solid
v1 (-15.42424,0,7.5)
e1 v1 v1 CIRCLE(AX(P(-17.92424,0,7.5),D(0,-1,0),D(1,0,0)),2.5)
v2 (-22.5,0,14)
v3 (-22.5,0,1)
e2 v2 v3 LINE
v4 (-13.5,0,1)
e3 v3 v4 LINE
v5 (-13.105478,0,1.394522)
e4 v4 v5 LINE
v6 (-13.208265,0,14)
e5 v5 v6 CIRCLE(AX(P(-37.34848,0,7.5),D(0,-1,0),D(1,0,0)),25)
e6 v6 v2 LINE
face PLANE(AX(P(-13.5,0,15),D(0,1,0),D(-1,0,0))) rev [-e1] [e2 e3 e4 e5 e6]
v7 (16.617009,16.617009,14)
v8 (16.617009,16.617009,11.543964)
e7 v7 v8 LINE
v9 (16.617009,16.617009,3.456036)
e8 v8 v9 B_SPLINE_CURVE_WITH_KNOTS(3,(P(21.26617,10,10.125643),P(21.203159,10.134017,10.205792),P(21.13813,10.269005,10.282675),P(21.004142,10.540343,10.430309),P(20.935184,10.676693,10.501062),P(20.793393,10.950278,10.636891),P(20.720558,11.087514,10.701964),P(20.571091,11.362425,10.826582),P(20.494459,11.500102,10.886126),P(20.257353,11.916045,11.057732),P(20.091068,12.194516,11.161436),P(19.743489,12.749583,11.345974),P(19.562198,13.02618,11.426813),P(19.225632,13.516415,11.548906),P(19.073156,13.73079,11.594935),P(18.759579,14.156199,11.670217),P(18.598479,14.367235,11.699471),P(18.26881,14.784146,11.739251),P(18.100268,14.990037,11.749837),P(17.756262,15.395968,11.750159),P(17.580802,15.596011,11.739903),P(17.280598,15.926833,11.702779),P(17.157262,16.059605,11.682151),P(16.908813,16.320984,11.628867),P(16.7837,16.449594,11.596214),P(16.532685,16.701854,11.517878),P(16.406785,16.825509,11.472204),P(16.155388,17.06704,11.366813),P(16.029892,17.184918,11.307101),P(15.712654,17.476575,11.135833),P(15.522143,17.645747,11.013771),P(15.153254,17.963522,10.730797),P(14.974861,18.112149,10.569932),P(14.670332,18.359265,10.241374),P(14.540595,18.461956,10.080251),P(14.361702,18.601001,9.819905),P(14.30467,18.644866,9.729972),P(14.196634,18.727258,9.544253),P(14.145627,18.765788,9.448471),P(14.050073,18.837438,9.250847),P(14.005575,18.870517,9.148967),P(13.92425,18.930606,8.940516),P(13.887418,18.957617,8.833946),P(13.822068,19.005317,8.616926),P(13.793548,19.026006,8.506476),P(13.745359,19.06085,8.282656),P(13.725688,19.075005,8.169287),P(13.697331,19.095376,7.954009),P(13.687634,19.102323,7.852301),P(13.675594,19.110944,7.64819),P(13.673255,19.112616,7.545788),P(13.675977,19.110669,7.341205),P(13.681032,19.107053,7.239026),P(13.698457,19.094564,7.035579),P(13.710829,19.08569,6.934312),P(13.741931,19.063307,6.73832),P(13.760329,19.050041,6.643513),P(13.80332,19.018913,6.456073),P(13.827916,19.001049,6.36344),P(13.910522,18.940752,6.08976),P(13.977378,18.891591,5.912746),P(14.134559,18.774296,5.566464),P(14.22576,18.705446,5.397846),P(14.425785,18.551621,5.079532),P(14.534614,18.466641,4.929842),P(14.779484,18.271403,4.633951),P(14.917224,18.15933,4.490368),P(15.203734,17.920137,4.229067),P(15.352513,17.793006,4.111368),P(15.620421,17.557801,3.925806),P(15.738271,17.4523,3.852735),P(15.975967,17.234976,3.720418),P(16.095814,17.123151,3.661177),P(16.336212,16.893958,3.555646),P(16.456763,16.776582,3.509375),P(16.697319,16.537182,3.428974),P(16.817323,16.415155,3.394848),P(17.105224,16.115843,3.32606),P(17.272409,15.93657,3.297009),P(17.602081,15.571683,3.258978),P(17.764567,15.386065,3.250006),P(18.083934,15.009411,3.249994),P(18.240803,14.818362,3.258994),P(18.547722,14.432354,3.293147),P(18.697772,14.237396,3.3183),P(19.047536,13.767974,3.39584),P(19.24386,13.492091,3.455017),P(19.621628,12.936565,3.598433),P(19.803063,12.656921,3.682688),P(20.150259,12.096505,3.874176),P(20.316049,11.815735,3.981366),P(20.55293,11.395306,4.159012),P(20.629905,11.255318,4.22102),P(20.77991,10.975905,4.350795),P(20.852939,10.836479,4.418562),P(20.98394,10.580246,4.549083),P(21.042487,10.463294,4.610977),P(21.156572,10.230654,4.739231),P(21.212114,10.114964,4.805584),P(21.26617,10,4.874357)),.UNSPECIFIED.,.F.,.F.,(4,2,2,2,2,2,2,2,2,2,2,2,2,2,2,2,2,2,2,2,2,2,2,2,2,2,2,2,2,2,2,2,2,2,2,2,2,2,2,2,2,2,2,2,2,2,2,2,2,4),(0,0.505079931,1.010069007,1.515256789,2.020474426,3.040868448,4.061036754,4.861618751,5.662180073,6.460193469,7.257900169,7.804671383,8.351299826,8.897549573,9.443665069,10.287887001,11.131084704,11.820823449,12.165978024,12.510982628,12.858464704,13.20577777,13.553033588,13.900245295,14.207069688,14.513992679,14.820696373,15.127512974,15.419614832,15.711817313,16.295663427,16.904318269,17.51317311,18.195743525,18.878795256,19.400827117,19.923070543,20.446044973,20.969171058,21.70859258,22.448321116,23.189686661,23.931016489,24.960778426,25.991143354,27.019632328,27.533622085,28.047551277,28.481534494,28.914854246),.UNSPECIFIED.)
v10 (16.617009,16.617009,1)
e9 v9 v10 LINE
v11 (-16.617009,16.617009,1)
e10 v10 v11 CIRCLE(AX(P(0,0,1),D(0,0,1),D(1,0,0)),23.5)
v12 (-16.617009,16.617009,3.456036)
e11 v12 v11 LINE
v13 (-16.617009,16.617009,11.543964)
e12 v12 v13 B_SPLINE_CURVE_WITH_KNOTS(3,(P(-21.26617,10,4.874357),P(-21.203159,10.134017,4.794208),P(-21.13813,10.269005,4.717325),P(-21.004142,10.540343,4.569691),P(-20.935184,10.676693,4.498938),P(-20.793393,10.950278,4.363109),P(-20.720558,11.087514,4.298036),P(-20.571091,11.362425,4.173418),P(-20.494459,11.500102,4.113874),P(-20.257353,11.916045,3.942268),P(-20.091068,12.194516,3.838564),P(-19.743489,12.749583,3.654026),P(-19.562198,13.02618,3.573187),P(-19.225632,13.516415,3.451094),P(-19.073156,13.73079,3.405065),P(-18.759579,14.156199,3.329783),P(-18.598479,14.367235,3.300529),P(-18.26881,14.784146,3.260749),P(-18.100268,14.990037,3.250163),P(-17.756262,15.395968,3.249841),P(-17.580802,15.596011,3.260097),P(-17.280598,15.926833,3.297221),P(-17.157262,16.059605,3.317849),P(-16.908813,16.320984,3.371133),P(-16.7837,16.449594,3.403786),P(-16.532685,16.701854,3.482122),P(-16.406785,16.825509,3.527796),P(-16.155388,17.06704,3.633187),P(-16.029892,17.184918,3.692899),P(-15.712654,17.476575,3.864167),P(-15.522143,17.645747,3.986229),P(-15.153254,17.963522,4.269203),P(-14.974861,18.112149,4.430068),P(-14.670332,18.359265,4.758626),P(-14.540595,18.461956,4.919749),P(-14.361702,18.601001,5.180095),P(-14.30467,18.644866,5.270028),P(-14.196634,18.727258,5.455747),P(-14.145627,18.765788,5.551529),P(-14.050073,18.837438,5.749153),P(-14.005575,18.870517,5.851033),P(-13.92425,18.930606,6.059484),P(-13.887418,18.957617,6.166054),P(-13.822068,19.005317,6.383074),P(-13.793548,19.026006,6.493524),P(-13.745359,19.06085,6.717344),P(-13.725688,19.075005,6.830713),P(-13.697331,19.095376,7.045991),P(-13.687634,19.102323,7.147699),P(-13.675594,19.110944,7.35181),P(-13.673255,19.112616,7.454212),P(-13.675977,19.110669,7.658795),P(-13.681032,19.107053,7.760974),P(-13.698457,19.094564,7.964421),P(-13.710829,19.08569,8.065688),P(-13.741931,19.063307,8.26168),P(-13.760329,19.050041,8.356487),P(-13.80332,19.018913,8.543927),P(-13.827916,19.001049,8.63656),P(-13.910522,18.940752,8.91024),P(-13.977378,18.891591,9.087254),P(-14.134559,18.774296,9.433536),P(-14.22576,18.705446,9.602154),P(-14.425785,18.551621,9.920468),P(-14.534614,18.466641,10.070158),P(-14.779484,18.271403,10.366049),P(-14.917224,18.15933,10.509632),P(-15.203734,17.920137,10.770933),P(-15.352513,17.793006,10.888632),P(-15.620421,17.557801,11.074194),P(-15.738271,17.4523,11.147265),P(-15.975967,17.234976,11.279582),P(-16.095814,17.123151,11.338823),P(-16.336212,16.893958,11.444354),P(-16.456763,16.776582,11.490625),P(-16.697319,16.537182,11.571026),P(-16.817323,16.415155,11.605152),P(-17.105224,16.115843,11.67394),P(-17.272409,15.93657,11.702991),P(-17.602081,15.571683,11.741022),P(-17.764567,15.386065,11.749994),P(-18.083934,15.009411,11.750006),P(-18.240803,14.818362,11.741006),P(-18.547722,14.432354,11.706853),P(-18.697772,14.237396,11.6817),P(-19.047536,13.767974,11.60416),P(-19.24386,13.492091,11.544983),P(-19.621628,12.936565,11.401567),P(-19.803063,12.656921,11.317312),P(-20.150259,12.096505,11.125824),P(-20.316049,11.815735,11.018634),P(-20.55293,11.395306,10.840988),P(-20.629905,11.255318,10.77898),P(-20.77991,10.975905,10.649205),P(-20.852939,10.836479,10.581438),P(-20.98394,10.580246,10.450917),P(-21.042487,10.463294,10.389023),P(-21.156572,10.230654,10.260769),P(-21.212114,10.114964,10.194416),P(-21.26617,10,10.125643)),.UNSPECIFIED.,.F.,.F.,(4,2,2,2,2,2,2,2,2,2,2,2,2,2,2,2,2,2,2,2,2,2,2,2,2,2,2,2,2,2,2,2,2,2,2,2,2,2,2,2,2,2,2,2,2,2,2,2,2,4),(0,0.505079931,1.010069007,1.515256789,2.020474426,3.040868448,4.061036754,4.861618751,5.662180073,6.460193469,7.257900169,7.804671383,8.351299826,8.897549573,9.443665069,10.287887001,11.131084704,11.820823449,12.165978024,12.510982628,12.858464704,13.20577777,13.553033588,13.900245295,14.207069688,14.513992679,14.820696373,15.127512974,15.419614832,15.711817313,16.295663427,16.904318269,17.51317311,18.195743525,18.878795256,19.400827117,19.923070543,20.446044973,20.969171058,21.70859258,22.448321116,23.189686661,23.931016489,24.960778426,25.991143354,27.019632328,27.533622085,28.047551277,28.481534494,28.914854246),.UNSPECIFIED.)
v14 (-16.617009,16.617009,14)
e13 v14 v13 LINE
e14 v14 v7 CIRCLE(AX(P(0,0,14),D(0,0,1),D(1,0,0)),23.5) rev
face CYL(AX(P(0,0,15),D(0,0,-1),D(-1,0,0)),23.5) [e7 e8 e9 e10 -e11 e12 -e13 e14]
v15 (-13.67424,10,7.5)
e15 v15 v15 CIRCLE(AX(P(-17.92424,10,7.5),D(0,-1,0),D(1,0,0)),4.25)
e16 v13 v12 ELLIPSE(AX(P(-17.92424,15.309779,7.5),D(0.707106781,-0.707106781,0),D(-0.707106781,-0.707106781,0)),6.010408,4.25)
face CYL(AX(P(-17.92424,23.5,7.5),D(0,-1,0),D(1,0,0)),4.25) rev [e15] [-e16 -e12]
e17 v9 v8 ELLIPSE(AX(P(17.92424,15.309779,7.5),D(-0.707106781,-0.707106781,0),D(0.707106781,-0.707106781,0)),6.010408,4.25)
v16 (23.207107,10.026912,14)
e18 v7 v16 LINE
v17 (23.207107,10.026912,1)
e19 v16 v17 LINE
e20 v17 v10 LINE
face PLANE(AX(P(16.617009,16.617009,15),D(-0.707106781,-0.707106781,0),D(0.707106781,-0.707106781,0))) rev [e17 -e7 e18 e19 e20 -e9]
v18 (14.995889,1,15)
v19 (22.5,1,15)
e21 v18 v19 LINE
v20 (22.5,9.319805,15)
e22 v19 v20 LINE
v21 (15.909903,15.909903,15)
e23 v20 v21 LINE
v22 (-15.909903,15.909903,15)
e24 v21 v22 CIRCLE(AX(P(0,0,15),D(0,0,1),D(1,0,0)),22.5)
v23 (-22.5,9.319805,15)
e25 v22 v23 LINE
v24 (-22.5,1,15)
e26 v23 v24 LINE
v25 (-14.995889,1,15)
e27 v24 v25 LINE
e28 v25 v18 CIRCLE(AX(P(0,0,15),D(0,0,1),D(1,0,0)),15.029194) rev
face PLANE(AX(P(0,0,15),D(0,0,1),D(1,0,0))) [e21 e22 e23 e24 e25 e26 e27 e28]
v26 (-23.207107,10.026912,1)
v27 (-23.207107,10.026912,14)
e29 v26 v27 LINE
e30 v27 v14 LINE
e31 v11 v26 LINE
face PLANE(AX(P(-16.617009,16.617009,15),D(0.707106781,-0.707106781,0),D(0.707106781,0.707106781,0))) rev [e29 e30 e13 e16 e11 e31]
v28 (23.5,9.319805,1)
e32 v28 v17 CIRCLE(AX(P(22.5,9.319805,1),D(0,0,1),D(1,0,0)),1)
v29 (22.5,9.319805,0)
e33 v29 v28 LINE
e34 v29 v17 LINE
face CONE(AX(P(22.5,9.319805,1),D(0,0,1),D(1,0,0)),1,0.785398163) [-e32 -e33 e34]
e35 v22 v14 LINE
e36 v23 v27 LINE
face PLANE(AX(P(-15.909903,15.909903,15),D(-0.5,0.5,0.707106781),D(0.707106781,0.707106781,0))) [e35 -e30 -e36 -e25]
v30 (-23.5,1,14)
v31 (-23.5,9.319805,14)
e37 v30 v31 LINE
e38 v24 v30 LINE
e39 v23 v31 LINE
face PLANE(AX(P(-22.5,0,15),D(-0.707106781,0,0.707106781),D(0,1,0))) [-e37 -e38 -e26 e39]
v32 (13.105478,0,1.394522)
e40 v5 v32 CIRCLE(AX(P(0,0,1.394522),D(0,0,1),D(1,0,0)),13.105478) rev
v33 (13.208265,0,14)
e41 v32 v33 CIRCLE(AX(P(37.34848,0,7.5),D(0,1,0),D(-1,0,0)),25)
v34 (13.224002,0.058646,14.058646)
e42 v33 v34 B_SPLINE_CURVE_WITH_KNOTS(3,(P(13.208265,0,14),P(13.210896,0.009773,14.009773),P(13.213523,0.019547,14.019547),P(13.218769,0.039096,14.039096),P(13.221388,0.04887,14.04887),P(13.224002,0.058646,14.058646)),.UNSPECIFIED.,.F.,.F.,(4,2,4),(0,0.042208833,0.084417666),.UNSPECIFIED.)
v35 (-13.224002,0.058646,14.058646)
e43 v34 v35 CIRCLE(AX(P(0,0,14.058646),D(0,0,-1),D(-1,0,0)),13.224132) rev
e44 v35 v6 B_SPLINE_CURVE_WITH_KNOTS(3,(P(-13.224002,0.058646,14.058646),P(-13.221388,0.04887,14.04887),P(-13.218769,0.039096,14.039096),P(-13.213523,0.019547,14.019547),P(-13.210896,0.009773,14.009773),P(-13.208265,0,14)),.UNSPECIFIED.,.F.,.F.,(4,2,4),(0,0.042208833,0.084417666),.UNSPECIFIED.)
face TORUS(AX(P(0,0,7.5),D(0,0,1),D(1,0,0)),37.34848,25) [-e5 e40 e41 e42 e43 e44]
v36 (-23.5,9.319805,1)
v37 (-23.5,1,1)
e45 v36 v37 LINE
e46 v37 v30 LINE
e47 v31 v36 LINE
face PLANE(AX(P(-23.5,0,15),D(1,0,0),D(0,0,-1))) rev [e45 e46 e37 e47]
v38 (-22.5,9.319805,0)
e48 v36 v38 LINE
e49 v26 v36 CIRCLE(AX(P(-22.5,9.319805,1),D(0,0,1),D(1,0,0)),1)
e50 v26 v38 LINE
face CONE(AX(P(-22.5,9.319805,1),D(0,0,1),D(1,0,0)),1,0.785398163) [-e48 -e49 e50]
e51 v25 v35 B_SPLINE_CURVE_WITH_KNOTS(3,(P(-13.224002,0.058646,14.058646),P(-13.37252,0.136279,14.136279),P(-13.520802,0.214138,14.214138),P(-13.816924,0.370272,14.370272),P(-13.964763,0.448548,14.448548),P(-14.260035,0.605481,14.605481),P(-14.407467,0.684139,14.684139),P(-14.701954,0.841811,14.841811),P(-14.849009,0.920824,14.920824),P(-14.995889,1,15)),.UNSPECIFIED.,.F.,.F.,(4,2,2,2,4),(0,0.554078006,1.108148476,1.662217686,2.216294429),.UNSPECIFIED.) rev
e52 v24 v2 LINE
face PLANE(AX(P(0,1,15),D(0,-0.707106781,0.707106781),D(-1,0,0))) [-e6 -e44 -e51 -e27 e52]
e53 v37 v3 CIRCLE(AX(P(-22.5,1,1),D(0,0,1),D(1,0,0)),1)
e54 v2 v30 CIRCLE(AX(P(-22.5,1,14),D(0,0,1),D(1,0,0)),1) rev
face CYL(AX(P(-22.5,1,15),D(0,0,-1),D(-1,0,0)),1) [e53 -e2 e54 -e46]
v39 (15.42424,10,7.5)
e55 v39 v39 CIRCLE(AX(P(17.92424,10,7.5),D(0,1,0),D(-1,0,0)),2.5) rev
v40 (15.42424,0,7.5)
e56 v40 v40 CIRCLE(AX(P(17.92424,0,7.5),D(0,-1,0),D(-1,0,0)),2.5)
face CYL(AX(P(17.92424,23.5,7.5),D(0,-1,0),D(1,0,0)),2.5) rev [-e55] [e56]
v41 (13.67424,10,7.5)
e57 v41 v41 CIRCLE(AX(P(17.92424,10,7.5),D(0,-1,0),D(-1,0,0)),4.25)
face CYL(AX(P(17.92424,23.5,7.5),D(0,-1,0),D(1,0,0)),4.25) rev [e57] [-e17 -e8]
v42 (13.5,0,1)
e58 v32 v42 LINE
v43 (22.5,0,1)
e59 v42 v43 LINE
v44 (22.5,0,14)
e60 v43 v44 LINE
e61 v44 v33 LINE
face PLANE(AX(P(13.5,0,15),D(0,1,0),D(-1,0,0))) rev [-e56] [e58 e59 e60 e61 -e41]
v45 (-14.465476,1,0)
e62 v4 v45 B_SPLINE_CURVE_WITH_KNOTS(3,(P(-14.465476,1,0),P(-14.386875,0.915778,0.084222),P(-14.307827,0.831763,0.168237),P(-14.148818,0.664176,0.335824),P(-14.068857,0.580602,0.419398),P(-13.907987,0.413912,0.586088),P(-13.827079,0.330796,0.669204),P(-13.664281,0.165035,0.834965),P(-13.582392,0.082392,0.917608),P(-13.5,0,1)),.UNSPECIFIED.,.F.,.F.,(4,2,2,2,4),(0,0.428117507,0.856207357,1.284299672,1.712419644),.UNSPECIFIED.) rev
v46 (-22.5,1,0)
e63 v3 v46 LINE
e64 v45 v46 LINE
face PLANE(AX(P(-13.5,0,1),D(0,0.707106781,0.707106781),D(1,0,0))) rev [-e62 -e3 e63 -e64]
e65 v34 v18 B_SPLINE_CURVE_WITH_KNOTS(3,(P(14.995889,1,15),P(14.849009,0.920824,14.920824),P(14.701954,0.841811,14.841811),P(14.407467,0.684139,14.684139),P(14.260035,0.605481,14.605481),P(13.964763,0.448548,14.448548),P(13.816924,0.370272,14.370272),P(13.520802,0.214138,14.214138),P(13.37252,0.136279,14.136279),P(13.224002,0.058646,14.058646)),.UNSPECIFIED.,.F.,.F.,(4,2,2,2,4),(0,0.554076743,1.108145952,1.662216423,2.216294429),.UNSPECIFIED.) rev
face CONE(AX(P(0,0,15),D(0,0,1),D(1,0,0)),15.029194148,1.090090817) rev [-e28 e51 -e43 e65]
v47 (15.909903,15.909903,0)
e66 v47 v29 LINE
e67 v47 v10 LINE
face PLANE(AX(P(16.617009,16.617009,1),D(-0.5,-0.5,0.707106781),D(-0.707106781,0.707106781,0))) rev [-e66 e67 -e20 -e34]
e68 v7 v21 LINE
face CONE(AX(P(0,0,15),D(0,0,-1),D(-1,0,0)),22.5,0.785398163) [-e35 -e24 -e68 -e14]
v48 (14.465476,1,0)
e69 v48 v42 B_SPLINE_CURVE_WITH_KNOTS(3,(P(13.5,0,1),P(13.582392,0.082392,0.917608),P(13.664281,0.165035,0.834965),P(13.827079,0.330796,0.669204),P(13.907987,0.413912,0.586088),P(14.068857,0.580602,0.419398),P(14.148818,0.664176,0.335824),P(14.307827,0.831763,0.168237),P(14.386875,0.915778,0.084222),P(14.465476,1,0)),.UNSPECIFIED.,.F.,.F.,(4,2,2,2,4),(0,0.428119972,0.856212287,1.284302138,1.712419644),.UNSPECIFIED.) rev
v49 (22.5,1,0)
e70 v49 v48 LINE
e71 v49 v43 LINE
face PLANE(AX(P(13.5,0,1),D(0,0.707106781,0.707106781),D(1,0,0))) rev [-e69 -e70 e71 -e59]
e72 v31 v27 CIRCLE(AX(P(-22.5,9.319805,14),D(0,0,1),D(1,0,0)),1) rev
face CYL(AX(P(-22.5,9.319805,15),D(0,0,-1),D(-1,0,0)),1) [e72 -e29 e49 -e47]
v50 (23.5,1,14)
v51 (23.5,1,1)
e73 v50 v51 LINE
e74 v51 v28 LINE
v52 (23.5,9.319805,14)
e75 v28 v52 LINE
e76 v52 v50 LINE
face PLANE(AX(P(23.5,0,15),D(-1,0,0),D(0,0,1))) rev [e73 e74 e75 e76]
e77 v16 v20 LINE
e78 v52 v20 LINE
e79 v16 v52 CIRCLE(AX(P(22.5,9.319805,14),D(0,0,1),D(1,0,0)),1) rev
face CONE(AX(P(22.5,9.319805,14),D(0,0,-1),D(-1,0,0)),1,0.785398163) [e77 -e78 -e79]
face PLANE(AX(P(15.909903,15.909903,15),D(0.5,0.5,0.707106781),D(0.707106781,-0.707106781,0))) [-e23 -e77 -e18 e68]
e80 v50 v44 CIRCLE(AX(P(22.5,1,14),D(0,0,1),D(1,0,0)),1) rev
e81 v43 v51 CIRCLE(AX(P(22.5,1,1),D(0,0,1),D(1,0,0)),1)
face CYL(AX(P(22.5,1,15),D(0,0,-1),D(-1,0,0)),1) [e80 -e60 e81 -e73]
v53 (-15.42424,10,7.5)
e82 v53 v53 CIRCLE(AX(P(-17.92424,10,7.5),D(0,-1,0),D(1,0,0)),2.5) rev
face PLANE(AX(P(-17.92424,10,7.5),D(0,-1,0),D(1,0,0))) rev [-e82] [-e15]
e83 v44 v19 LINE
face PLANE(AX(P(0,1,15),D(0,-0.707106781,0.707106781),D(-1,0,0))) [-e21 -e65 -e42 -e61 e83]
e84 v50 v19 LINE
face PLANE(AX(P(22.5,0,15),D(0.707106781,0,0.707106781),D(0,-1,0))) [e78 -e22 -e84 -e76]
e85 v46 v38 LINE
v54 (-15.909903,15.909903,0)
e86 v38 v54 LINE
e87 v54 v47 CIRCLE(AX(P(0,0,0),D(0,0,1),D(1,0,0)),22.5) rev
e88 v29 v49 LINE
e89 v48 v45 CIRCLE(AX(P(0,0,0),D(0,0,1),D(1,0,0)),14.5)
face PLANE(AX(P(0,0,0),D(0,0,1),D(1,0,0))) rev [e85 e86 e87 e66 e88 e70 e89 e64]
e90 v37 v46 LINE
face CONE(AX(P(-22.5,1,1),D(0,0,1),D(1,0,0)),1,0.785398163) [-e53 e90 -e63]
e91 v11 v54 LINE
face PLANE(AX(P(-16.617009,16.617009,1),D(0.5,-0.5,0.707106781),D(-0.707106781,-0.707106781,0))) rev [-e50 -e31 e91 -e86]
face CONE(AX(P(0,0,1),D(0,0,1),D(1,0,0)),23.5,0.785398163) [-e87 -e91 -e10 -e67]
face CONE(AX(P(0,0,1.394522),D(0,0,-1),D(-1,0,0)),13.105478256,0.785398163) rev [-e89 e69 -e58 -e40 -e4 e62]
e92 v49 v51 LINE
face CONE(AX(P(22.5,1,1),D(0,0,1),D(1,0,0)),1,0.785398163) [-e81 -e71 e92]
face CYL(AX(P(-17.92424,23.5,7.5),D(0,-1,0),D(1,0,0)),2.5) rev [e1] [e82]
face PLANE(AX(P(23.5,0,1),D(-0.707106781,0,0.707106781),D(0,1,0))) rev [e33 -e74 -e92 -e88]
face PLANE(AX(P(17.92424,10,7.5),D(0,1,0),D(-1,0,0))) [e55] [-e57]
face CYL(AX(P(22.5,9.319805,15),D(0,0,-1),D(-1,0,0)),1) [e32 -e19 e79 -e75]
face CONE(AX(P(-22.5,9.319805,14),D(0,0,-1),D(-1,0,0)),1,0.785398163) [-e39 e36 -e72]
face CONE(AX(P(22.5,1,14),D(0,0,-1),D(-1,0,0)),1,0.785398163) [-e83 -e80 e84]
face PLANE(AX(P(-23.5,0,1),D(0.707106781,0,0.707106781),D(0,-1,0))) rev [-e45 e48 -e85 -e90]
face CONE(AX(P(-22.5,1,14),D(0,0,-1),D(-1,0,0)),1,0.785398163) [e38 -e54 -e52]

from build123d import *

# Parameters (mm, degrees)
BOSS_EXTRUDE1_DEPTH = 15
REVOLVE1_ANGLE      = 180
SKETCH3_R           = 2.5
CUT_EXTRUDE1_DEPTH  = 37.462309307
CUT_EXTRUDE2_START  = -10
SKETCH4_R           = 4.25
CUT_EXTRUDE2_DEPTH  = 27.462309413
FILLET1_R           = 1
CHAMFER1_SIZE       = 1.529194148
CHAMFER1_SIZE_2     = 1


with BuildPart() as part:
    # Sketch1 → Boss-Extrude1 (new body)
    with BuildSketch(Plane.XY):
        with BuildLine():
            Line((-13.5, 0), (-23.5, 0))
            Line((-23.5, 0), (-23.5, 9.734018716))
            Line((-23.5, 9.734018716), (-16.617009358, 16.617009358))
            ThreePointArc((-16.617009358, 16.617009358), (0, 23.5), (16.617009358, 16.617009358))
            Line((16.617009358, 16.617009358), (23.5, 9.734018716))
            Line((23.5, 9.734018716), (23.5, 0))
            Line((23.5, 0), (13.5, 0))
            ThreePointArc((13.5, 0), (0, 13.5), (-13.5, 0))
        make_face()
    extrude(amount=BOSS_EXTRUDE1_DEPTH)

    # Sketch2 → Revolve1 (revolve)
    with BuildSketch(Plane.XZ):
        with BuildLine():
            Line((-13.5, 15), (-13.5, 0))
            ThreePointArc((-13.5, 0), (-12.348480035, 7.5), (-13.5, 15))
        make_face()
    revolve(axis=Axis((0, 0, 7.5), (0, 0, -1)), revolution_arc=REVOLVE1_ANGLE)

    # Sketch3 → Cut-Extrude1 (cut, through all)
    with BuildSketch(Plane.XZ):
        with Locations((-17.924240018, 7.5)):
            Circle(SKETCH3_R)
        with Locations(Location((17.924240018, 7.5, 0), (0, 0, 121.526459575))):
            Circle(SKETCH3_R)
    extrude(amount=-CUT_EXTRUDE1_DEPTH, mode=Mode.SUBTRACT)

    # Sketch4 → Cut-Extrude2 (cut, through all)
    with BuildSketch(Plane.XZ.offset(CUT_EXTRUDE2_START)):
        with Locations((-17.924240018, 7.5)):
            Circle(SKETCH4_R)
        with Locations(Location((17.924240018, 7.5, 0), (0, 0, 252.086328454))):
            Circle(SKETCH4_R)
    extrude(amount=-CUT_EXTRUDE2_DEPTH, mode=Mode.SUBTRACT)

    # Fillet1
    fillet1_edges = [part.edges().sort_by_distance(p)[0] for p in [
        (23.5, 9.734018716, 7.5),
        (23.5, 0, 7.5),
        (-23.5, 0, 7.5),
        (-23.5, 9.734018716, 7.5),
    ]]
    fillet(fillet1_edges, radius=FILLET1_R)

    # Chamfer1
    # the kernel refuses this chamfer: 1.529194148, 1 mm, written as the material it takes off along each edge
    with BuildSketch(Plane(origin=(0, 0, 15), x_dir=(0.9571659368895994, -0.2895399268810014, 0), z_dir=(-0.2895399268810014, -0.9571659368895994, 0))) as chamfer1_piece_1:
        with BuildLine():
            Line((13.224132078, -0.941354132), (13.5 + CHAMFER1_SIZE, 0))
            Line((13.5 + CHAMFER1_SIZE, 0), (13.5, 0))
            ThreePointArc((13.5, 0), (13.351499892, -0.489654504), (13.224132078, -0.941354132))
        make_face()
    revolve(axis=Axis((0, 0, 15), (0, 0, 1)), revolution_arc=213.660828251, mode=Mode.SUBTRACT)
    with BuildSketch(Plane(origin=(0, 0, 0), x_dir=(0.9613944909393555, -0.27517382286739694, 0), z_dir=(-0.27517382286739694, -0.9613944909393555, 0))) as chamfer1_piece_2:
        with BuildLine():
            Line((13.5 + CHAMFER1_SIZE_2, 0), (13.105478256, 1.394521744))
            ThreePointArc((13.105478256, 1.394521744), (13.285379501, 0.720089037), (13.5, 0))
            Line((13.5, 0), (13.5 + CHAMFER1_SIZE_2, 0))
        make_face()
    revolve(axis=Axis((0, 0, 0), (0, 0, 1)), revolution_arc=211.944746271, mode=Mode.SUBTRACT)
    # the kernel refuses this chamfer: 1.529194148, 1 mm, written as the material it takes off along each edge
    with BuildSketch(Plane(origin=(-23.207106781, 10.026911935, 0), x_dir=(0.7071067811865477, -0.7071067811865475, 0), z_dir=(0.7071067811865475, 0.7071067811865477, 0)), Plane(origin=(16.617009358, 16.617009358, 0), x_dir=(-0.7071067811865477, -0.7071067811865475, 0), z_dir=(0.7071067811865475, -0.7071067811865477, 0))) as chamfer1_2_piece_1:
        Polygon((CHAMFER1_SIZE_2, 0), (0, -CHAMFER1_SIZE_2), (0, 0), align=None)
    extrude(amount=9.319805153, mode=Mode.SUBTRACT)
    with BuildSketch(Plane(origin=(0, 0, 0), x_dir=(-0.7071067811865478, 0.7071067811865472, 0), z_dir=(-0.7071067811865472, -0.7071067811865478, 0))) as chamfer1_2_piece_2:
        Polygon((23.5 - CHAMFER1_SIZE_2, 0), (23.5, -CHAMFER1_SIZE_2), (23.5, 0), align=None)
    revolve(axis=Axis((0, 0, 0), (0, 0, -1)), revolution_arc=90, mode=Mode.SUBTRACT)
    with BuildSketch(Plane(origin=(-23.207106781, 10.026911935, 15), x_dir=(0.7071067811865477, -0.7071067811865475, 0), z_dir=(0.7071067811865475, 0.7071067811865477, 0)), Plane(origin=(16.617009358, 16.617009358, 15), x_dir=(-0.7071067811865477, -0.7071067811865475, 0), z_dir=(0.7071067811865475, -0.7071067811865477, 0))) as chamfer1_2_piece_3:
        Polygon((CHAMFER1_SIZE_2, 0), (0, CHAMFER1_SIZE_2), (0, 0), align=None)
    extrude(amount=9.319805153, mode=Mode.SUBTRACT)
    with BuildSketch(Plane(origin=(22.5, 0, 15), x_dir=(0, 1, 0), z_dir=(-1, 0, 0))) as chamfer1_2_piece_4:
        Polygon((CHAMFER1_SIZE_2, 0), (0, CHAMFER1_SIZE_2), (0, 0), align=None)
    extrude(amount=10.04248884, mode=Mode.SUBTRACT)
    with BuildSketch(Plane(origin=(23.5, 9.319805153, 0), x_dir=(-1, 0, 0), z_dir=(0, -1, 0)), Plane(origin=(-23.5, 1, 0), x_dir=(1, 0, 0), z_dir=(0, 1, 0))) as chamfer1_2_piece_5:
        Polygon((CHAMFER1_SIZE_2, 0), (0, -CHAMFER1_SIZE_2), (0, 0), align=None)
    extrude(amount=8.319805153, mode=Mode.SUBTRACT)
    with BuildSketch(Plane(origin=(23.5, 9.319805153, 15), x_dir=(-1, 0, 0), z_dir=(0, -1, 0)), Plane(origin=(-23.5, 1, 15), x_dir=(1, 0, 0), z_dir=(0, 1, 0))) as chamfer1_2_piece_6:
        Polygon((CHAMFER1_SIZE_2, 0), (0, CHAMFER1_SIZE_2), (0, 0), align=None)
    extrude(amount=8.319805153, mode=Mode.SUBTRACT)
    with BuildSketch(Plane(origin=(-11.928317012, 0, 0), x_dir=(0, 0, 1), z_dir=(-1, 0, 0))) as chamfer1_2_piece_7:
        Polygon((CHAMFER1_SIZE_2, 0), (0, CHAMFER1_SIZE_2), (0, 0), align=None)
    extrude(amount=10.571682988, mode=Mode.SUBTRACT)
    with BuildSketch(Plane(origin=(-22.5, 1, 0), x_dir=(0, -1, 0), z_dir=(1, 0, 0))) as chamfer1_2_piece_8:
        Polygon((1 - CHAMFER1_SIZE_2, 0), (1, -CHAMFER1_SIZE_2), (1, 0), align=None)
    revolve(axis=Axis((-22.5, 1, 0), (0, 0, -1)), revolution_arc=90, mode=Mode.SUBTRACT)
    with BuildSketch(Plane(origin=(-22.5, 9.319805153, 0), x_dir=(-1, 0, 0), z_dir=(0, -1, 0))) as chamfer1_2_piece_9:
        Polygon((1 - CHAMFER1_SIZE_2, 0), (1, -CHAMFER1_SIZE_2), (1, 0), align=None)
    revolve(axis=Axis((-22.5, 9.319805153, 0), (0, 0, -1)), revolution_arc=45, mode=Mode.SUBTRACT)
    with BuildSketch(Plane(origin=(22.5, 9.319805153, 0), x_dir=(0.7071067811865458, 0.7071067811865493, 0), z_dir=(-0.7071067811865493, 0.7071067811865458, 0))) as chamfer1_2_piece_10:
        Polygon((1 - CHAMFER1_SIZE_2, 0), (1, -CHAMFER1_SIZE_2), (1, 0), align=None)
    revolve(axis=Axis((22.5, 9.319805153, 0), (0, 0, -1)), revolution_arc=45, mode=Mode.SUBTRACT)
    with BuildSketch(Plane(origin=(22.5, 1, 0), x_dir=(1, 0, 0), z_dir=(0, 1, 0))) as chamfer1_2_piece_11:
        Polygon((1 - CHAMFER1_SIZE_2, 0), (1, -CHAMFER1_SIZE_2), (1, 0), align=None)
    revolve(axis=Axis((22.5, 1, 0), (0, 0, -1)), revolution_arc=90, mode=Mode.SUBTRACT)
    with BuildSketch(Plane(origin=(-12.45751116, 0, 15), x_dir=(0, 0, -1), z_dir=(-1, 0, 0))) as chamfer1_2_piece_12:
        Polygon((CHAMFER1_SIZE_2, 0), (0, -CHAMFER1_SIZE_2), (0, 0), align=None)
    extrude(amount=10.04248884, mode=Mode.SUBTRACT)
    with BuildSketch(Plane(origin=(-22.5, 1, 15), x_dir=(0, -1, 0), z_dir=(1, 0, 0))) as chamfer1_2_piece_13:
        Polygon((1, CHAMFER1_SIZE_2), (1 - CHAMFER1_SIZE_2, 0), (1, 0), align=None)
    revolve(axis=Axis((-22.5, 1, 15), (0, 0, -1)), revolution_arc=90, mode=Mode.SUBTRACT)
    with BuildSketch(Plane(origin=(-22.5, 9.319805153, 15), x_dir=(-1, 0, 0), z_dir=(0, -1, 0))) as chamfer1_2_piece_14:
        Polygon((1 - CHAMFER1_SIZE_2, 0), (1, CHAMFER1_SIZE_2), (1, 0), align=None)
    revolve(axis=Axis((-22.5, 9.319805153, 15), (0, 0, -1)), revolution_arc=45, mode=Mode.SUBTRACT)
    with BuildSketch(Plane(origin=(22.5, 9.319805153, 15), x_dir=(0.7071067811865458, 0.7071067811865493, 0), z_dir=(-0.7071067811865493, 0.7071067811865458, 0))) as chamfer1_2_piece_15:
        Polygon((1 - CHAMFER1_SIZE_2, 0), (1, CHAMFER1_SIZE_2), (1, 0), align=None)
    revolve(axis=Axis((22.5, 9.319805153, 15), (0, 0, -1)), revolution_arc=45, mode=Mode.SUBTRACT)
    with BuildSketch(Plane(origin=(22.5, 1, 15), x_dir=(1, 0, 0), z_dir=(0, 1, 0))) as chamfer1_2_piece_16:
        Polygon((1 - CHAMFER1_SIZE_2, 0), (1, CHAMFER1_SIZE_2), (1, 0), align=None)
    revolve(axis=Axis((22.5, 1, 15), (0, 0, -1)), revolution_arc=90, mode=Mode.SUBTRACT)
    with BuildSketch(Plane(origin=(0, 0, 15), x_dir=(-0.7071067811865478, 0.7071067811865472, 0), z_dir=(-0.7071067811865472, -0.7071067811865478, 0))) as chamfer1_2_piece_17:
        Polygon((23.5 - CHAMFER1_SIZE_2, 0), (23.5, CHAMFER1_SIZE_2), (23.5, 0), align=None)
    revolve(axis=Axis((0, 0, 15), (0, 0, -1)), revolution_arc=90, mode=Mode.SUBTRACT)
    with BuildSketch(Plane(origin=(22.5, 0, 0), x_dir=(0, 1, 0), z_dir=(-1, 0, 0))) as chamfer1_2_piece_18:
        Polygon((CHAMFER1_SIZE_2, 0), (0, -CHAMFER1_SIZE_2), (0, 0), align=None)
    extrude(amount=10.571682988, mode=Mode.SUBTRACT)


solid = part.part
